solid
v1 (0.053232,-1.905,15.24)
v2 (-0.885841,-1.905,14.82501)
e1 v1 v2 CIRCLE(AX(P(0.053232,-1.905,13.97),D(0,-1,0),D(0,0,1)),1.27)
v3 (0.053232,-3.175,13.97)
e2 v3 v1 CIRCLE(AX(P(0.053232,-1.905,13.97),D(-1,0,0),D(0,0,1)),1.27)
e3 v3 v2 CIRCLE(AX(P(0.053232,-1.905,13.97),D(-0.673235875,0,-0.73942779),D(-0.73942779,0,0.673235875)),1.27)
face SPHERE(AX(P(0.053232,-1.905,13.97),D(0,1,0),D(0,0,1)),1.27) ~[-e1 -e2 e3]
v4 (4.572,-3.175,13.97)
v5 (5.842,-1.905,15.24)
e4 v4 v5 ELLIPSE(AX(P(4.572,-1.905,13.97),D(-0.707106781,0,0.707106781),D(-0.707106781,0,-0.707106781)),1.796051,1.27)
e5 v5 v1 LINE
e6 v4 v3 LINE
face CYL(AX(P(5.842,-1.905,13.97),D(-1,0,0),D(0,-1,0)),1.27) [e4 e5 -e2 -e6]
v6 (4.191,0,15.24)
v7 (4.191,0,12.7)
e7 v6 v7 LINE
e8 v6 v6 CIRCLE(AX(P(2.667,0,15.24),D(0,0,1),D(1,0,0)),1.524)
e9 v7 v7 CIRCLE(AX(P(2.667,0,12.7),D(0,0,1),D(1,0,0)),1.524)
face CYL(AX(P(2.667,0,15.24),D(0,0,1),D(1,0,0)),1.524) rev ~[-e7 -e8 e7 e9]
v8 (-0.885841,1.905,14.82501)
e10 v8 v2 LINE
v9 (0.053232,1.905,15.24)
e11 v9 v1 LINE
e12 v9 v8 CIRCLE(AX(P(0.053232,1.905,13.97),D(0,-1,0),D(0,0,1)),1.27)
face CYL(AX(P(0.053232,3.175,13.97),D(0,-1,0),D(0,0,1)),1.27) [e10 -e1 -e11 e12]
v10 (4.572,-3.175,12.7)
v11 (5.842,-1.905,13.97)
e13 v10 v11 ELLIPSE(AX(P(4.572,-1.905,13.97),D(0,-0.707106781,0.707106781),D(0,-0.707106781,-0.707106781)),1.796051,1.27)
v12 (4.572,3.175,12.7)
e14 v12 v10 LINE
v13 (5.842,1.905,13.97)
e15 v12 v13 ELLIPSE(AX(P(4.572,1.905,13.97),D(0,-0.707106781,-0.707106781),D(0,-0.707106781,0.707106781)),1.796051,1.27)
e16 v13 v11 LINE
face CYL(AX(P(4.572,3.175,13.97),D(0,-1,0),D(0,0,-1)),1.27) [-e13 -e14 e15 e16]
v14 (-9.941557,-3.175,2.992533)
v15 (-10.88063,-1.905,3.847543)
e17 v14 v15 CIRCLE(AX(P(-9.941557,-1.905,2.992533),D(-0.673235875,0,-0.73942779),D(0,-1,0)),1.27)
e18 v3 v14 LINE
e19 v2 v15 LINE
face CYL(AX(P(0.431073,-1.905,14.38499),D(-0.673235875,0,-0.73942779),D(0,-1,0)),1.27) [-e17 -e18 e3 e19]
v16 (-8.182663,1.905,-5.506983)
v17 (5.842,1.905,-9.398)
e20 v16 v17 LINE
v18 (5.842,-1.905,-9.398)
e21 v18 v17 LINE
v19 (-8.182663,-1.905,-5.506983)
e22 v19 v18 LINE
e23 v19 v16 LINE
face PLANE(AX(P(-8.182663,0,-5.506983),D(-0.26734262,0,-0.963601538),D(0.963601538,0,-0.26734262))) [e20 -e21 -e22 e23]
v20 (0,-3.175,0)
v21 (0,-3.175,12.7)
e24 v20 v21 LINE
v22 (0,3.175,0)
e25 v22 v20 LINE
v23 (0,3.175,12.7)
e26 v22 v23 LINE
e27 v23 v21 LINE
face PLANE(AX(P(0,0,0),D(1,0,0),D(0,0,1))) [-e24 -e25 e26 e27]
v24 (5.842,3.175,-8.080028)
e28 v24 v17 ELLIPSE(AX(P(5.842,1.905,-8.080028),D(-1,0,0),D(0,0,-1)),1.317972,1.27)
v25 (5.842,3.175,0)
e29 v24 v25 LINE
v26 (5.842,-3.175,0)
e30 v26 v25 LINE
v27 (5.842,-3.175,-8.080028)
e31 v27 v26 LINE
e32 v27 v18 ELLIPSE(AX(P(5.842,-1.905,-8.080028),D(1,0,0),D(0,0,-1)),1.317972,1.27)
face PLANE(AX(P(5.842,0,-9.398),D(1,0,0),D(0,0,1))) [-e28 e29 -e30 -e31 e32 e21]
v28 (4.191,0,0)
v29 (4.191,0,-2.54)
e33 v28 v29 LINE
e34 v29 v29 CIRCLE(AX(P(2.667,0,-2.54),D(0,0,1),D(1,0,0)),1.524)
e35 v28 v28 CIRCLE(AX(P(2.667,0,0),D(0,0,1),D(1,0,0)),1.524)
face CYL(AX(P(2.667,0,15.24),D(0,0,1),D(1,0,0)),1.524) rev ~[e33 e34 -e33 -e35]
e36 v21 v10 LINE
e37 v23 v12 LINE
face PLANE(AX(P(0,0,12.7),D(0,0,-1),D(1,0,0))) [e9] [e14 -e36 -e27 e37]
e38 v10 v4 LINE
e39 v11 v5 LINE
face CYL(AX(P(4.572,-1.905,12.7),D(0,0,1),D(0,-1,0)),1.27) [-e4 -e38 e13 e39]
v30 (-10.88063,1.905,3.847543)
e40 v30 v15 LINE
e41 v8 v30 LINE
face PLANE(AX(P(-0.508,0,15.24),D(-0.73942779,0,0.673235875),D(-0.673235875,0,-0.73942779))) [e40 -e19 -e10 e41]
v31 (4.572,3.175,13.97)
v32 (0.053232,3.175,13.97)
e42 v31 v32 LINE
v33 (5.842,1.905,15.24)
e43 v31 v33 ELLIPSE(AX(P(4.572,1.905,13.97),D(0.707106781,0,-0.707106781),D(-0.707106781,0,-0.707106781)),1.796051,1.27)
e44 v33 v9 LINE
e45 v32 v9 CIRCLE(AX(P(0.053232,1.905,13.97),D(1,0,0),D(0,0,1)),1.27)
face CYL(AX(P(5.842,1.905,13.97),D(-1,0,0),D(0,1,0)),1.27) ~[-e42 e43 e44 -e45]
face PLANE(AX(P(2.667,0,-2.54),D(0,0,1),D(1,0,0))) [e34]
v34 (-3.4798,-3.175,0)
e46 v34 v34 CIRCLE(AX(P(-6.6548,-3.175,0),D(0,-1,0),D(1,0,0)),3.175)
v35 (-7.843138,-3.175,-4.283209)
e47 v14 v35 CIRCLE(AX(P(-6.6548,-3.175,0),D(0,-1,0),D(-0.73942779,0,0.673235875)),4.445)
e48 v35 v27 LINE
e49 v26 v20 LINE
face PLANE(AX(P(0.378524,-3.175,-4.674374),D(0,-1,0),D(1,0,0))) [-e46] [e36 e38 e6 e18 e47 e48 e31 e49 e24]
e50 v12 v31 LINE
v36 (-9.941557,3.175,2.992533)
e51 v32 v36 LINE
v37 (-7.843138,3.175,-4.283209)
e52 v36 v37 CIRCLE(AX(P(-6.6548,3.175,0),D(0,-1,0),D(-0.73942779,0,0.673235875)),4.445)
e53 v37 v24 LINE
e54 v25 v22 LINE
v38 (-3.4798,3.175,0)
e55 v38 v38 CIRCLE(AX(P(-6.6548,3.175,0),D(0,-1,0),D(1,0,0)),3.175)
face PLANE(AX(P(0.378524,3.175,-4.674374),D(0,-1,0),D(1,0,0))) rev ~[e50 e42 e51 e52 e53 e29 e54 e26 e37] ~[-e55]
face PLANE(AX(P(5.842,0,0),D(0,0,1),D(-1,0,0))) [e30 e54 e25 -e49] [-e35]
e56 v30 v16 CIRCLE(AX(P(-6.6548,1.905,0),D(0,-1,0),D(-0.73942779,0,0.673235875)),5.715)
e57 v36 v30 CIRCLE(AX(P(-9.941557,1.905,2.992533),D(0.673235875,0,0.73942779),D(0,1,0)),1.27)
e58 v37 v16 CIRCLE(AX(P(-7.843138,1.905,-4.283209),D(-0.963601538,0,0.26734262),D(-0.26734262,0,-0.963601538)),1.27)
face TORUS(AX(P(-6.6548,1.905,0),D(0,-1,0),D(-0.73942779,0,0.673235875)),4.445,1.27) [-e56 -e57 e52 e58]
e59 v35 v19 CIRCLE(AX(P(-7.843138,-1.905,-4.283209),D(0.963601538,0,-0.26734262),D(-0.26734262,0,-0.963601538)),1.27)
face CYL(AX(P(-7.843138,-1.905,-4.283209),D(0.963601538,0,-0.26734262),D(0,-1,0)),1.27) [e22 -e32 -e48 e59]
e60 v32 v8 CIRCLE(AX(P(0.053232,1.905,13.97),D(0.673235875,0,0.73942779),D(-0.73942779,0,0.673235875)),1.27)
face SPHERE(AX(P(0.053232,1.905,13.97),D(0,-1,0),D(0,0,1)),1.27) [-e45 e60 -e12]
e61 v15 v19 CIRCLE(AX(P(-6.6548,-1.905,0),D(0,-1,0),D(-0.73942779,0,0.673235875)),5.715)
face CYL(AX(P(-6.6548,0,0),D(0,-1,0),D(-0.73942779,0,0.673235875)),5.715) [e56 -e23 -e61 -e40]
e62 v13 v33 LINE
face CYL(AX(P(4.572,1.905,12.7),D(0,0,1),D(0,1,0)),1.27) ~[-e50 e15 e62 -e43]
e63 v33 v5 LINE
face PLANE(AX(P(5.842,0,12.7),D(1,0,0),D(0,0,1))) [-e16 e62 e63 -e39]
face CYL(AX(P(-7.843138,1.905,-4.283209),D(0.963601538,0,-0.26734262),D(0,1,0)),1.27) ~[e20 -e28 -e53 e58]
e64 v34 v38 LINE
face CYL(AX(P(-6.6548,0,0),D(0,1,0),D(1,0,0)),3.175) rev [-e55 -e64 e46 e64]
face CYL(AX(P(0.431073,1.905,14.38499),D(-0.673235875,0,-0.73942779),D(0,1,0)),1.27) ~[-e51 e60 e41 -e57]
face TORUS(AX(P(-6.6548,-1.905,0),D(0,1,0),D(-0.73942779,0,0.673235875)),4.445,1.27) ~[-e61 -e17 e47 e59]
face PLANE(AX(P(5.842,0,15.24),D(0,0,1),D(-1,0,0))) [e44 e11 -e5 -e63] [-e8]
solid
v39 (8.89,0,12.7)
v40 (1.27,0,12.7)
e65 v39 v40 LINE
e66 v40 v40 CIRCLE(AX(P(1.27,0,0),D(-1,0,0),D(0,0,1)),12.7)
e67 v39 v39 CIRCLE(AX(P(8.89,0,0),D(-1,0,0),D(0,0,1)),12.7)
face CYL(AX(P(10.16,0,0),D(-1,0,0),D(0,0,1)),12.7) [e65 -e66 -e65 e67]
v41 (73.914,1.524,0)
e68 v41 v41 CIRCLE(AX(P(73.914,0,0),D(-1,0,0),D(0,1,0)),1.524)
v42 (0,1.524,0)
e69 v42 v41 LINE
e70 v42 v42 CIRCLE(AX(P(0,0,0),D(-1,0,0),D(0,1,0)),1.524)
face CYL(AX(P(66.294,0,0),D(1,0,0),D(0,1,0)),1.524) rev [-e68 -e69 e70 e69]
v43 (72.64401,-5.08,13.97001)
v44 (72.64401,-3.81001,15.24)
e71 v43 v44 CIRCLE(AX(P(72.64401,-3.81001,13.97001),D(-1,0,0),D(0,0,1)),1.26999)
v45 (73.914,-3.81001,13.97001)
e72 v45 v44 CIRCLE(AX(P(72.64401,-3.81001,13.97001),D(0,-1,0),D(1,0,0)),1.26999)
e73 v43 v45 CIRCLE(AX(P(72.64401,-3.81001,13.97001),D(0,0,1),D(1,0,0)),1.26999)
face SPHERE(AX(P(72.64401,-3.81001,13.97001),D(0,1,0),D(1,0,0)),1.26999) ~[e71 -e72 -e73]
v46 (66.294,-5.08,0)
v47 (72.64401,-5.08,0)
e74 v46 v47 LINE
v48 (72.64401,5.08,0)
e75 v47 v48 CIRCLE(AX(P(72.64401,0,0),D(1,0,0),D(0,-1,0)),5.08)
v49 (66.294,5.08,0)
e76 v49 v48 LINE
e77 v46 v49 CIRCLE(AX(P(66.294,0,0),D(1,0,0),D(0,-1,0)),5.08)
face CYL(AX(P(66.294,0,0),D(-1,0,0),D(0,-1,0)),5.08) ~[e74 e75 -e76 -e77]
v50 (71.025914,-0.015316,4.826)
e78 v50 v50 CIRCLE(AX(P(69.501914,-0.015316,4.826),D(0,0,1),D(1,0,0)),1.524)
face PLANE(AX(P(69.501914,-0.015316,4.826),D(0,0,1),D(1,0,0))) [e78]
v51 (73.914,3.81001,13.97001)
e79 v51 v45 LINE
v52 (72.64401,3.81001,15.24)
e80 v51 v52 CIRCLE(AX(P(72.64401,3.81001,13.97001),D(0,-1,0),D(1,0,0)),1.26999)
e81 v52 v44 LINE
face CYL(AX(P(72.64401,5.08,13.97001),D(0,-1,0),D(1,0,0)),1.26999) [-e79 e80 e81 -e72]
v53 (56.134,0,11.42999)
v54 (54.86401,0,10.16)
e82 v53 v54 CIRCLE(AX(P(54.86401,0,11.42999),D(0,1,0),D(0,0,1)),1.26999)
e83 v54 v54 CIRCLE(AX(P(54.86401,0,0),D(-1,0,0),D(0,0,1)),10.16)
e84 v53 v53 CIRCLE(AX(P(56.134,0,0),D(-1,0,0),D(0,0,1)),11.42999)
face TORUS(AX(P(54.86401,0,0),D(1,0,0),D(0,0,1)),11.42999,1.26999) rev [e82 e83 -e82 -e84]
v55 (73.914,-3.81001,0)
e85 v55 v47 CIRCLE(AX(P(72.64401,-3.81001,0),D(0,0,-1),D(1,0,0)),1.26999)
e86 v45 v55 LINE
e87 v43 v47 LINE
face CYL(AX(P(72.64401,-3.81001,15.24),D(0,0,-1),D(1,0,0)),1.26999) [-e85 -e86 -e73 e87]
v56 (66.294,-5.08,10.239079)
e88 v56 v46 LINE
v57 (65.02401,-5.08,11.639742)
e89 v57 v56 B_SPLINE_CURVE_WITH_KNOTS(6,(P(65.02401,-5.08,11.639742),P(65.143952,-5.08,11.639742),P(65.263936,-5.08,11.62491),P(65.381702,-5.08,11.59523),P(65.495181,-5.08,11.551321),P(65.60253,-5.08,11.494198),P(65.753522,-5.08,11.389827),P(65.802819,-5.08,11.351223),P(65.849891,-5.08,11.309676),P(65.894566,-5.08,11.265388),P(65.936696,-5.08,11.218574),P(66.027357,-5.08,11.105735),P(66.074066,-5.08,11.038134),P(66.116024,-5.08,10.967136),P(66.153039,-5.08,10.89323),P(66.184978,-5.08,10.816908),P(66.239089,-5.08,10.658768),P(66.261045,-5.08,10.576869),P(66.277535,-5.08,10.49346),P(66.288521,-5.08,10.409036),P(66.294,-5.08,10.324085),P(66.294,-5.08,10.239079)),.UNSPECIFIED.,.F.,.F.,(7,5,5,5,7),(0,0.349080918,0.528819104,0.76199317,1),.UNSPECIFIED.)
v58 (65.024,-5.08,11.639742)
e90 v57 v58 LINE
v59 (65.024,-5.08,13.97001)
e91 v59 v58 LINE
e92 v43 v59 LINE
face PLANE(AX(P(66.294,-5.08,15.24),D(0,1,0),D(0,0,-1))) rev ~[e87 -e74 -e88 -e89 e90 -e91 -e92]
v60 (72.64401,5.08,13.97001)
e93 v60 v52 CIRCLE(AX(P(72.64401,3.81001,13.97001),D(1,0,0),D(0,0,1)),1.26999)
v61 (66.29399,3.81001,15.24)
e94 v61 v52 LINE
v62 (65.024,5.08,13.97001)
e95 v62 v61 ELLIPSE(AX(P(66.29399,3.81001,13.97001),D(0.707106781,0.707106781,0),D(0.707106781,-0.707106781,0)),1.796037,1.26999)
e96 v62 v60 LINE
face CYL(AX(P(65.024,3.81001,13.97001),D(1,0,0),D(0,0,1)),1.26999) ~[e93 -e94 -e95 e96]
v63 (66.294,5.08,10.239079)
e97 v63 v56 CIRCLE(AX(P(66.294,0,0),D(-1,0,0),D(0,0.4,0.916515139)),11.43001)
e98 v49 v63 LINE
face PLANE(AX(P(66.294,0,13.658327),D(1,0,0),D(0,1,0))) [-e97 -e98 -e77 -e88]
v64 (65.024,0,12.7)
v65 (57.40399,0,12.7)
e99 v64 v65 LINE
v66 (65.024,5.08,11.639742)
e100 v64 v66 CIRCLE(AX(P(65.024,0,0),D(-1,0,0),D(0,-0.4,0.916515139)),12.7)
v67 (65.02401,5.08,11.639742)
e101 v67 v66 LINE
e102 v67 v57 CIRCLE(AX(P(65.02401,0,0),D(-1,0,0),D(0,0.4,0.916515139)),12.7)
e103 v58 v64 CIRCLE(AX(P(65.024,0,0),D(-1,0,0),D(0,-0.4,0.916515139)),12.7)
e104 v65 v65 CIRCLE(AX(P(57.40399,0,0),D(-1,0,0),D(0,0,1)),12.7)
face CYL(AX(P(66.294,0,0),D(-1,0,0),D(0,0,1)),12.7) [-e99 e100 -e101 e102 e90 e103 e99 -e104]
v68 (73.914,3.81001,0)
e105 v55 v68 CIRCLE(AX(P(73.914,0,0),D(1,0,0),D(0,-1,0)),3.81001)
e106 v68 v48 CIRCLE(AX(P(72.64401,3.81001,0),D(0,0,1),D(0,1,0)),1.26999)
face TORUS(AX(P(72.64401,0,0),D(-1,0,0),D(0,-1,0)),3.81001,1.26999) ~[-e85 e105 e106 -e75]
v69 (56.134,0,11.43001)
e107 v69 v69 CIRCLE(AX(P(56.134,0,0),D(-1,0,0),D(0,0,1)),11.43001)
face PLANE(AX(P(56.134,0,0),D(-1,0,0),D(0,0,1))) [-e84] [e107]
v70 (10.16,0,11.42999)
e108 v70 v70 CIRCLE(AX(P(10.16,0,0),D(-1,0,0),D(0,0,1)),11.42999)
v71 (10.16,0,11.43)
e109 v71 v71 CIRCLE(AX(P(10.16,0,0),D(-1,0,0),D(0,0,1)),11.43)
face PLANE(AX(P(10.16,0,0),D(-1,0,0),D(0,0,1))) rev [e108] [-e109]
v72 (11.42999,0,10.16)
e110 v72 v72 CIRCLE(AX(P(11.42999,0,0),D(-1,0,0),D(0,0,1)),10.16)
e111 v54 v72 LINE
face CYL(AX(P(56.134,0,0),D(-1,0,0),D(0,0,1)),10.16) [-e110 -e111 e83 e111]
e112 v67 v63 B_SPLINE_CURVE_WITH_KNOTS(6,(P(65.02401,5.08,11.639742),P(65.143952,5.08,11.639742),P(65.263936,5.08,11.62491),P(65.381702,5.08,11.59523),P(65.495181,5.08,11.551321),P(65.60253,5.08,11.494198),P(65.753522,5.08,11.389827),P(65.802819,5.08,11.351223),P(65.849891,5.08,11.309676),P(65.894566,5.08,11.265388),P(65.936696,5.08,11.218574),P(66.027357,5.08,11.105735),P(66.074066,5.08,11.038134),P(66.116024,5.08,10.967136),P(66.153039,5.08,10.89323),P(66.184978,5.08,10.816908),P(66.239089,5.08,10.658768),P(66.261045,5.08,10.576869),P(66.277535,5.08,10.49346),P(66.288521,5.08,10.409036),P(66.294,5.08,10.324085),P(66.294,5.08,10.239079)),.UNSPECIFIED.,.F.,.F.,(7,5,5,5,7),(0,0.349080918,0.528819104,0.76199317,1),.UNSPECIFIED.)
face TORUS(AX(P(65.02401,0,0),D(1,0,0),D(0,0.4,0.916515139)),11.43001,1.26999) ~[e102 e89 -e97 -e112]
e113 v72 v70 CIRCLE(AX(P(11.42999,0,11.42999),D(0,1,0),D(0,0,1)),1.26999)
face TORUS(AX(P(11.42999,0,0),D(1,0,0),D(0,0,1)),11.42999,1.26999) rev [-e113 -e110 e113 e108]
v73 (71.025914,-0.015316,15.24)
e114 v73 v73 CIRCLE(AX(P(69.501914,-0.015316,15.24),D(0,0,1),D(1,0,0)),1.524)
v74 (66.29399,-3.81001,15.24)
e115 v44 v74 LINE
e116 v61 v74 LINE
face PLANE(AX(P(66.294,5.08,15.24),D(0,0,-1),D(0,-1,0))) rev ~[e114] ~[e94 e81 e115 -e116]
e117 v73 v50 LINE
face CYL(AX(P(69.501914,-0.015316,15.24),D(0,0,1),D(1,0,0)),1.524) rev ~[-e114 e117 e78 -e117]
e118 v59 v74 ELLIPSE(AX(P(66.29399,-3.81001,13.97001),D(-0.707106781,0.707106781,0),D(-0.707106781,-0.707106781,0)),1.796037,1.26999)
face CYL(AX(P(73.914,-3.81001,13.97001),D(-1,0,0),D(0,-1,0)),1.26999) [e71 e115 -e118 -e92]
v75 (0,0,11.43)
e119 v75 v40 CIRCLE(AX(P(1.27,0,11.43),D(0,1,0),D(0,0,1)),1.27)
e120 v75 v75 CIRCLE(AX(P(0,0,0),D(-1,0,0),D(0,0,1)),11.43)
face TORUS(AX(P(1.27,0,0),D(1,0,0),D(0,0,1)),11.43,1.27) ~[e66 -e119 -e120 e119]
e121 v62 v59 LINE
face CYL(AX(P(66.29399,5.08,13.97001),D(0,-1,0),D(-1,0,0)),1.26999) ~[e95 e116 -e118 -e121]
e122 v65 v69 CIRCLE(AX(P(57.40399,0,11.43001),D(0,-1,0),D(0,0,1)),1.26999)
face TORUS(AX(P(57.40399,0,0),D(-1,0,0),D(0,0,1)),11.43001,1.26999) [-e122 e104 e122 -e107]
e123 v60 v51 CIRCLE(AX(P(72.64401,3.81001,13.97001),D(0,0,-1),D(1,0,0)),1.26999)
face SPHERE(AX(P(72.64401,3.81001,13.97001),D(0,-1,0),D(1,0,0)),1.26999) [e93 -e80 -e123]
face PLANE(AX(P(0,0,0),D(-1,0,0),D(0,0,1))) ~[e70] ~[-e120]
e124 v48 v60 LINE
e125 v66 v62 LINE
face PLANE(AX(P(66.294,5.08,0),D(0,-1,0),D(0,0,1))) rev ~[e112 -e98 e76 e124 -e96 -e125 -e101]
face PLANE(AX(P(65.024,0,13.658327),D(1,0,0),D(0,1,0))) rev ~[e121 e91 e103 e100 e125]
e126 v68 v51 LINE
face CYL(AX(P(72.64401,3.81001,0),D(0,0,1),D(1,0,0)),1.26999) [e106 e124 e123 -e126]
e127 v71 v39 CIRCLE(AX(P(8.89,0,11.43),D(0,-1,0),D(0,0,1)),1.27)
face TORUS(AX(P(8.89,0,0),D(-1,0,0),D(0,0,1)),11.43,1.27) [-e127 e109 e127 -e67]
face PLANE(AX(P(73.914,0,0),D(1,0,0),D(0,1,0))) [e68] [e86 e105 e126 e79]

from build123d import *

# Parameters (mm, degrees)
F0_W      = 5.842
F0_H      = 12.7
F0_R      = 3.175
F2_DEPTH  = 3.175
F4_DEPTH  = 1.27
F5_DEPTH  = 7.62
F6_DEPTH  = 66.294
F8_R      = 1.524
F9_DEPTH  = 10.414
F10_R     = 1.524
F11_DEPTH = 17.78
F12_R     = 1.27
F12_2_R   = 1.27
F13_R     = 1.26999


# Not quite as in the source:
# - a fillet or chamfer is up to 0.001 mm smaller than in the source, because OpenCascade refuses the exact size


with BuildPart() as f1:
    # F0 (on Front) → F1 (revolve)
    with BuildSketch(Plane.XZ):
        with Locations((2.921, 6.35)):
            Rectangle(F0_W, F0_H)
        Polygon((5.842, 12.7), (5.842, 0), (66.294, 0), (66.294, 12.7), (56.134, 12.7), (56.134, 10.16), (10.16, 10.16), (10.16, 12.7), align=None)
    revolve(axis=Axis((33.147, 0, 0), (-1, 0, 0)))

    # F3 (on face) → F4 (join)
    with BuildSketch(Plane.YZ.offset(66.294)):
        with BuildLine():
            Line((-5.08, 15.24), (-5.08, 11.6397422652))
            ThreePointArc((-5.08, 11.6397422652), (0, 12.7), (5.08, 11.6397422652))
            Line((5.08, 11.6397422652), (5.08, 15.24))
            Line((5.08, 15.24), (-5.08, 15.24))
        make_face()
    extrude(amount=-F4_DEPTH)

    # F3 (on face) → F5 (join)
    with BuildSketch(Plane.YZ.offset(66.294)):
        with BuildLine():
            ThreePointArc((5.08, 0), (0, 5.08), (-5.08, 0))
            ThreePointArc((-5.08, 0), (0, -5.08), (5.08, 0))
        make_face()
        with BuildLine():
            ThreePointArc((-1.524, 0), (0, 1.524), (1.524, 0))
            ThreePointArc((1.524, 0), (0, -1.524), (-1.524, 0))
        make_face(mode=Mode.SUBTRACT)
        with BuildLine():
            Line((-5.08, 15.24), (-5.08, 0))
            ThreePointArc((-5.08, 0), (0, 5.08), (5.08, 0))
            Line((5.08, 0), (5.08, 15.24))
            Line((5.08, 15.24), (-5.08, 15.24))
        make_face()
    extrude(amount=F5_DEPTH)

    # F6 (cut, through all): a face of the model
    f6_faces = [f1.faces().sort_by_distance(p)[0] for p in [
        (66.294, 0, 0),
    ]]
    extrude(f6_faces, amount=-F6_DEPTH, mode=Mode.SUBTRACT)

    # F8 (on face) → F9 (cut)
    with BuildSketch(Plane.XY.offset(15.24)):
        with Locations((69.501914084, -0.015315949)):
            Circle(F8_R)
    extrude(amount=-F9_DEPTH, mode=Mode.SUBTRACT)

    # F12
    f12_edges = [f1.edges().sort_by_distance(p)[0] for p in [
        (0, 0, -12.7),
        (10.16, 0, -12.7),
    ]]
    fillet(f12_edges, radius=F12_R)

    # F13 (radius 1.27 in the source; OpenCascade refuses exactly that, so slightly less here)
    f13_edges = [f1.edges().sort_by_distance(p)[0] for p in [
        (66.294, 0, -12.7),
        (56.134, 0, -12.7),
        (73.914, 0, 15.24),
        (73.914, -5.08, 7.62),
        (70.104, -5.08, 0),
        (69.469, -5.08, 15.24),
        (65.024, 0, 15.24),
        (69.469, 5.08, 15.24),
        (56.134, 0, -10.16),
        (10.16, 0, -10.16),
        (33.147, 0, 10.16),
        (73.914, 0, -5.08),
        (73.914, 5.08, 7.62),
    ]]
    fillet(f13_edges, radius=F13_R)


with BuildPart() as f2:
    # F0 (on Front) → F2 (new body, symmetric)
    with BuildSketch(Plane.XZ):
        with BuildLine():
            Line((5.842, 0), (0, 0))
            Line((0, 0), (-0.9398, 0))
            ThreePointArc((-0.9398, 0), (-3.1957909266, -4.5493385486), (-8.1826630726, -5.5069827884))
            Line((-8.1826630726, -5.5069827884), (5.842, -9.398))
            Line((5.842, -9.398), (5.842, 0))
        make_face()
        with BuildLine():
            ThreePointArc((-8.1826630726, -5.5069827884), (-3.1957909266, -4.5493385486), (-0.9398, 0))
            ThreePointArc((-0.9398, 0), (-4.5919612295, 5.3297205562), (-10.8806298187, 3.8475430269))
            ThreePointArc((-10.8806298187, 3.8475430269), (-12.1459778134, -1.5837270034), (-8.1826630726, -5.5069827884))
        make_face()
        with Locations((-6.6548, 0)):
            Circle(F0_R, mode=Mode.SUBTRACT)
        with BuildLine():
            Line((-0.9398, 0), (0, 0))
            Line((0, 0), (0, 12.7))
            Line((0, 12.7), (5.842, 12.7))
            Line((5.842, 12.7), (5.842, 15.24))
            Line((5.842, 15.24), (-0.508, 15.24))
            Line((-0.508, 15.24), (-10.8806298187, 3.8475430269))
            ThreePointArc((-10.8806298187, 3.8475430269), (-4.5919612295, 5.3297205562), (-0.9398, 0))
        make_face()
    extrude(amount=F2_DEPTH, both=True)

    # F10 (on face) → F11 (cut)
    with BuildSketch(Plane.XY.offset(15.24)):
        with Locations((2.667, 0)):
            Circle(F10_R)
    extrude(amount=-F11_DEPTH, mode=Mode.SUBTRACT)

    # F12#2
    f12_2_edges = [f2.edges().sort_by_distance(p)[0] for p in [
        (-5.694315, -3.175, 9.543772),
        (-5.694315, 3.175, 9.543772),
        (-10.88063, 0, 3.847543),
        (-0.508, 0, 15.24),
        (2.667, -3.175, 15.24),
        (2.667, 3.175, 15.24),
        (5.842, 0, 12.7),
        (5.842, -3.175, 13.97),
        (5.842, 3.175, 13.97),
        (-8.182663, 0, -5.506983),
        (-1.170332, -3.175, -7.452491),
        (-1.170332, 3.175, -7.452491),
        (-12.145978, 3.175, -1.583727),
        (-12.145978, -3.175, -1.583727),
    ]]
    fillet(f12_2_edges, radius=F12_2_R)


solid = Compound([f1.part, f2.part])
